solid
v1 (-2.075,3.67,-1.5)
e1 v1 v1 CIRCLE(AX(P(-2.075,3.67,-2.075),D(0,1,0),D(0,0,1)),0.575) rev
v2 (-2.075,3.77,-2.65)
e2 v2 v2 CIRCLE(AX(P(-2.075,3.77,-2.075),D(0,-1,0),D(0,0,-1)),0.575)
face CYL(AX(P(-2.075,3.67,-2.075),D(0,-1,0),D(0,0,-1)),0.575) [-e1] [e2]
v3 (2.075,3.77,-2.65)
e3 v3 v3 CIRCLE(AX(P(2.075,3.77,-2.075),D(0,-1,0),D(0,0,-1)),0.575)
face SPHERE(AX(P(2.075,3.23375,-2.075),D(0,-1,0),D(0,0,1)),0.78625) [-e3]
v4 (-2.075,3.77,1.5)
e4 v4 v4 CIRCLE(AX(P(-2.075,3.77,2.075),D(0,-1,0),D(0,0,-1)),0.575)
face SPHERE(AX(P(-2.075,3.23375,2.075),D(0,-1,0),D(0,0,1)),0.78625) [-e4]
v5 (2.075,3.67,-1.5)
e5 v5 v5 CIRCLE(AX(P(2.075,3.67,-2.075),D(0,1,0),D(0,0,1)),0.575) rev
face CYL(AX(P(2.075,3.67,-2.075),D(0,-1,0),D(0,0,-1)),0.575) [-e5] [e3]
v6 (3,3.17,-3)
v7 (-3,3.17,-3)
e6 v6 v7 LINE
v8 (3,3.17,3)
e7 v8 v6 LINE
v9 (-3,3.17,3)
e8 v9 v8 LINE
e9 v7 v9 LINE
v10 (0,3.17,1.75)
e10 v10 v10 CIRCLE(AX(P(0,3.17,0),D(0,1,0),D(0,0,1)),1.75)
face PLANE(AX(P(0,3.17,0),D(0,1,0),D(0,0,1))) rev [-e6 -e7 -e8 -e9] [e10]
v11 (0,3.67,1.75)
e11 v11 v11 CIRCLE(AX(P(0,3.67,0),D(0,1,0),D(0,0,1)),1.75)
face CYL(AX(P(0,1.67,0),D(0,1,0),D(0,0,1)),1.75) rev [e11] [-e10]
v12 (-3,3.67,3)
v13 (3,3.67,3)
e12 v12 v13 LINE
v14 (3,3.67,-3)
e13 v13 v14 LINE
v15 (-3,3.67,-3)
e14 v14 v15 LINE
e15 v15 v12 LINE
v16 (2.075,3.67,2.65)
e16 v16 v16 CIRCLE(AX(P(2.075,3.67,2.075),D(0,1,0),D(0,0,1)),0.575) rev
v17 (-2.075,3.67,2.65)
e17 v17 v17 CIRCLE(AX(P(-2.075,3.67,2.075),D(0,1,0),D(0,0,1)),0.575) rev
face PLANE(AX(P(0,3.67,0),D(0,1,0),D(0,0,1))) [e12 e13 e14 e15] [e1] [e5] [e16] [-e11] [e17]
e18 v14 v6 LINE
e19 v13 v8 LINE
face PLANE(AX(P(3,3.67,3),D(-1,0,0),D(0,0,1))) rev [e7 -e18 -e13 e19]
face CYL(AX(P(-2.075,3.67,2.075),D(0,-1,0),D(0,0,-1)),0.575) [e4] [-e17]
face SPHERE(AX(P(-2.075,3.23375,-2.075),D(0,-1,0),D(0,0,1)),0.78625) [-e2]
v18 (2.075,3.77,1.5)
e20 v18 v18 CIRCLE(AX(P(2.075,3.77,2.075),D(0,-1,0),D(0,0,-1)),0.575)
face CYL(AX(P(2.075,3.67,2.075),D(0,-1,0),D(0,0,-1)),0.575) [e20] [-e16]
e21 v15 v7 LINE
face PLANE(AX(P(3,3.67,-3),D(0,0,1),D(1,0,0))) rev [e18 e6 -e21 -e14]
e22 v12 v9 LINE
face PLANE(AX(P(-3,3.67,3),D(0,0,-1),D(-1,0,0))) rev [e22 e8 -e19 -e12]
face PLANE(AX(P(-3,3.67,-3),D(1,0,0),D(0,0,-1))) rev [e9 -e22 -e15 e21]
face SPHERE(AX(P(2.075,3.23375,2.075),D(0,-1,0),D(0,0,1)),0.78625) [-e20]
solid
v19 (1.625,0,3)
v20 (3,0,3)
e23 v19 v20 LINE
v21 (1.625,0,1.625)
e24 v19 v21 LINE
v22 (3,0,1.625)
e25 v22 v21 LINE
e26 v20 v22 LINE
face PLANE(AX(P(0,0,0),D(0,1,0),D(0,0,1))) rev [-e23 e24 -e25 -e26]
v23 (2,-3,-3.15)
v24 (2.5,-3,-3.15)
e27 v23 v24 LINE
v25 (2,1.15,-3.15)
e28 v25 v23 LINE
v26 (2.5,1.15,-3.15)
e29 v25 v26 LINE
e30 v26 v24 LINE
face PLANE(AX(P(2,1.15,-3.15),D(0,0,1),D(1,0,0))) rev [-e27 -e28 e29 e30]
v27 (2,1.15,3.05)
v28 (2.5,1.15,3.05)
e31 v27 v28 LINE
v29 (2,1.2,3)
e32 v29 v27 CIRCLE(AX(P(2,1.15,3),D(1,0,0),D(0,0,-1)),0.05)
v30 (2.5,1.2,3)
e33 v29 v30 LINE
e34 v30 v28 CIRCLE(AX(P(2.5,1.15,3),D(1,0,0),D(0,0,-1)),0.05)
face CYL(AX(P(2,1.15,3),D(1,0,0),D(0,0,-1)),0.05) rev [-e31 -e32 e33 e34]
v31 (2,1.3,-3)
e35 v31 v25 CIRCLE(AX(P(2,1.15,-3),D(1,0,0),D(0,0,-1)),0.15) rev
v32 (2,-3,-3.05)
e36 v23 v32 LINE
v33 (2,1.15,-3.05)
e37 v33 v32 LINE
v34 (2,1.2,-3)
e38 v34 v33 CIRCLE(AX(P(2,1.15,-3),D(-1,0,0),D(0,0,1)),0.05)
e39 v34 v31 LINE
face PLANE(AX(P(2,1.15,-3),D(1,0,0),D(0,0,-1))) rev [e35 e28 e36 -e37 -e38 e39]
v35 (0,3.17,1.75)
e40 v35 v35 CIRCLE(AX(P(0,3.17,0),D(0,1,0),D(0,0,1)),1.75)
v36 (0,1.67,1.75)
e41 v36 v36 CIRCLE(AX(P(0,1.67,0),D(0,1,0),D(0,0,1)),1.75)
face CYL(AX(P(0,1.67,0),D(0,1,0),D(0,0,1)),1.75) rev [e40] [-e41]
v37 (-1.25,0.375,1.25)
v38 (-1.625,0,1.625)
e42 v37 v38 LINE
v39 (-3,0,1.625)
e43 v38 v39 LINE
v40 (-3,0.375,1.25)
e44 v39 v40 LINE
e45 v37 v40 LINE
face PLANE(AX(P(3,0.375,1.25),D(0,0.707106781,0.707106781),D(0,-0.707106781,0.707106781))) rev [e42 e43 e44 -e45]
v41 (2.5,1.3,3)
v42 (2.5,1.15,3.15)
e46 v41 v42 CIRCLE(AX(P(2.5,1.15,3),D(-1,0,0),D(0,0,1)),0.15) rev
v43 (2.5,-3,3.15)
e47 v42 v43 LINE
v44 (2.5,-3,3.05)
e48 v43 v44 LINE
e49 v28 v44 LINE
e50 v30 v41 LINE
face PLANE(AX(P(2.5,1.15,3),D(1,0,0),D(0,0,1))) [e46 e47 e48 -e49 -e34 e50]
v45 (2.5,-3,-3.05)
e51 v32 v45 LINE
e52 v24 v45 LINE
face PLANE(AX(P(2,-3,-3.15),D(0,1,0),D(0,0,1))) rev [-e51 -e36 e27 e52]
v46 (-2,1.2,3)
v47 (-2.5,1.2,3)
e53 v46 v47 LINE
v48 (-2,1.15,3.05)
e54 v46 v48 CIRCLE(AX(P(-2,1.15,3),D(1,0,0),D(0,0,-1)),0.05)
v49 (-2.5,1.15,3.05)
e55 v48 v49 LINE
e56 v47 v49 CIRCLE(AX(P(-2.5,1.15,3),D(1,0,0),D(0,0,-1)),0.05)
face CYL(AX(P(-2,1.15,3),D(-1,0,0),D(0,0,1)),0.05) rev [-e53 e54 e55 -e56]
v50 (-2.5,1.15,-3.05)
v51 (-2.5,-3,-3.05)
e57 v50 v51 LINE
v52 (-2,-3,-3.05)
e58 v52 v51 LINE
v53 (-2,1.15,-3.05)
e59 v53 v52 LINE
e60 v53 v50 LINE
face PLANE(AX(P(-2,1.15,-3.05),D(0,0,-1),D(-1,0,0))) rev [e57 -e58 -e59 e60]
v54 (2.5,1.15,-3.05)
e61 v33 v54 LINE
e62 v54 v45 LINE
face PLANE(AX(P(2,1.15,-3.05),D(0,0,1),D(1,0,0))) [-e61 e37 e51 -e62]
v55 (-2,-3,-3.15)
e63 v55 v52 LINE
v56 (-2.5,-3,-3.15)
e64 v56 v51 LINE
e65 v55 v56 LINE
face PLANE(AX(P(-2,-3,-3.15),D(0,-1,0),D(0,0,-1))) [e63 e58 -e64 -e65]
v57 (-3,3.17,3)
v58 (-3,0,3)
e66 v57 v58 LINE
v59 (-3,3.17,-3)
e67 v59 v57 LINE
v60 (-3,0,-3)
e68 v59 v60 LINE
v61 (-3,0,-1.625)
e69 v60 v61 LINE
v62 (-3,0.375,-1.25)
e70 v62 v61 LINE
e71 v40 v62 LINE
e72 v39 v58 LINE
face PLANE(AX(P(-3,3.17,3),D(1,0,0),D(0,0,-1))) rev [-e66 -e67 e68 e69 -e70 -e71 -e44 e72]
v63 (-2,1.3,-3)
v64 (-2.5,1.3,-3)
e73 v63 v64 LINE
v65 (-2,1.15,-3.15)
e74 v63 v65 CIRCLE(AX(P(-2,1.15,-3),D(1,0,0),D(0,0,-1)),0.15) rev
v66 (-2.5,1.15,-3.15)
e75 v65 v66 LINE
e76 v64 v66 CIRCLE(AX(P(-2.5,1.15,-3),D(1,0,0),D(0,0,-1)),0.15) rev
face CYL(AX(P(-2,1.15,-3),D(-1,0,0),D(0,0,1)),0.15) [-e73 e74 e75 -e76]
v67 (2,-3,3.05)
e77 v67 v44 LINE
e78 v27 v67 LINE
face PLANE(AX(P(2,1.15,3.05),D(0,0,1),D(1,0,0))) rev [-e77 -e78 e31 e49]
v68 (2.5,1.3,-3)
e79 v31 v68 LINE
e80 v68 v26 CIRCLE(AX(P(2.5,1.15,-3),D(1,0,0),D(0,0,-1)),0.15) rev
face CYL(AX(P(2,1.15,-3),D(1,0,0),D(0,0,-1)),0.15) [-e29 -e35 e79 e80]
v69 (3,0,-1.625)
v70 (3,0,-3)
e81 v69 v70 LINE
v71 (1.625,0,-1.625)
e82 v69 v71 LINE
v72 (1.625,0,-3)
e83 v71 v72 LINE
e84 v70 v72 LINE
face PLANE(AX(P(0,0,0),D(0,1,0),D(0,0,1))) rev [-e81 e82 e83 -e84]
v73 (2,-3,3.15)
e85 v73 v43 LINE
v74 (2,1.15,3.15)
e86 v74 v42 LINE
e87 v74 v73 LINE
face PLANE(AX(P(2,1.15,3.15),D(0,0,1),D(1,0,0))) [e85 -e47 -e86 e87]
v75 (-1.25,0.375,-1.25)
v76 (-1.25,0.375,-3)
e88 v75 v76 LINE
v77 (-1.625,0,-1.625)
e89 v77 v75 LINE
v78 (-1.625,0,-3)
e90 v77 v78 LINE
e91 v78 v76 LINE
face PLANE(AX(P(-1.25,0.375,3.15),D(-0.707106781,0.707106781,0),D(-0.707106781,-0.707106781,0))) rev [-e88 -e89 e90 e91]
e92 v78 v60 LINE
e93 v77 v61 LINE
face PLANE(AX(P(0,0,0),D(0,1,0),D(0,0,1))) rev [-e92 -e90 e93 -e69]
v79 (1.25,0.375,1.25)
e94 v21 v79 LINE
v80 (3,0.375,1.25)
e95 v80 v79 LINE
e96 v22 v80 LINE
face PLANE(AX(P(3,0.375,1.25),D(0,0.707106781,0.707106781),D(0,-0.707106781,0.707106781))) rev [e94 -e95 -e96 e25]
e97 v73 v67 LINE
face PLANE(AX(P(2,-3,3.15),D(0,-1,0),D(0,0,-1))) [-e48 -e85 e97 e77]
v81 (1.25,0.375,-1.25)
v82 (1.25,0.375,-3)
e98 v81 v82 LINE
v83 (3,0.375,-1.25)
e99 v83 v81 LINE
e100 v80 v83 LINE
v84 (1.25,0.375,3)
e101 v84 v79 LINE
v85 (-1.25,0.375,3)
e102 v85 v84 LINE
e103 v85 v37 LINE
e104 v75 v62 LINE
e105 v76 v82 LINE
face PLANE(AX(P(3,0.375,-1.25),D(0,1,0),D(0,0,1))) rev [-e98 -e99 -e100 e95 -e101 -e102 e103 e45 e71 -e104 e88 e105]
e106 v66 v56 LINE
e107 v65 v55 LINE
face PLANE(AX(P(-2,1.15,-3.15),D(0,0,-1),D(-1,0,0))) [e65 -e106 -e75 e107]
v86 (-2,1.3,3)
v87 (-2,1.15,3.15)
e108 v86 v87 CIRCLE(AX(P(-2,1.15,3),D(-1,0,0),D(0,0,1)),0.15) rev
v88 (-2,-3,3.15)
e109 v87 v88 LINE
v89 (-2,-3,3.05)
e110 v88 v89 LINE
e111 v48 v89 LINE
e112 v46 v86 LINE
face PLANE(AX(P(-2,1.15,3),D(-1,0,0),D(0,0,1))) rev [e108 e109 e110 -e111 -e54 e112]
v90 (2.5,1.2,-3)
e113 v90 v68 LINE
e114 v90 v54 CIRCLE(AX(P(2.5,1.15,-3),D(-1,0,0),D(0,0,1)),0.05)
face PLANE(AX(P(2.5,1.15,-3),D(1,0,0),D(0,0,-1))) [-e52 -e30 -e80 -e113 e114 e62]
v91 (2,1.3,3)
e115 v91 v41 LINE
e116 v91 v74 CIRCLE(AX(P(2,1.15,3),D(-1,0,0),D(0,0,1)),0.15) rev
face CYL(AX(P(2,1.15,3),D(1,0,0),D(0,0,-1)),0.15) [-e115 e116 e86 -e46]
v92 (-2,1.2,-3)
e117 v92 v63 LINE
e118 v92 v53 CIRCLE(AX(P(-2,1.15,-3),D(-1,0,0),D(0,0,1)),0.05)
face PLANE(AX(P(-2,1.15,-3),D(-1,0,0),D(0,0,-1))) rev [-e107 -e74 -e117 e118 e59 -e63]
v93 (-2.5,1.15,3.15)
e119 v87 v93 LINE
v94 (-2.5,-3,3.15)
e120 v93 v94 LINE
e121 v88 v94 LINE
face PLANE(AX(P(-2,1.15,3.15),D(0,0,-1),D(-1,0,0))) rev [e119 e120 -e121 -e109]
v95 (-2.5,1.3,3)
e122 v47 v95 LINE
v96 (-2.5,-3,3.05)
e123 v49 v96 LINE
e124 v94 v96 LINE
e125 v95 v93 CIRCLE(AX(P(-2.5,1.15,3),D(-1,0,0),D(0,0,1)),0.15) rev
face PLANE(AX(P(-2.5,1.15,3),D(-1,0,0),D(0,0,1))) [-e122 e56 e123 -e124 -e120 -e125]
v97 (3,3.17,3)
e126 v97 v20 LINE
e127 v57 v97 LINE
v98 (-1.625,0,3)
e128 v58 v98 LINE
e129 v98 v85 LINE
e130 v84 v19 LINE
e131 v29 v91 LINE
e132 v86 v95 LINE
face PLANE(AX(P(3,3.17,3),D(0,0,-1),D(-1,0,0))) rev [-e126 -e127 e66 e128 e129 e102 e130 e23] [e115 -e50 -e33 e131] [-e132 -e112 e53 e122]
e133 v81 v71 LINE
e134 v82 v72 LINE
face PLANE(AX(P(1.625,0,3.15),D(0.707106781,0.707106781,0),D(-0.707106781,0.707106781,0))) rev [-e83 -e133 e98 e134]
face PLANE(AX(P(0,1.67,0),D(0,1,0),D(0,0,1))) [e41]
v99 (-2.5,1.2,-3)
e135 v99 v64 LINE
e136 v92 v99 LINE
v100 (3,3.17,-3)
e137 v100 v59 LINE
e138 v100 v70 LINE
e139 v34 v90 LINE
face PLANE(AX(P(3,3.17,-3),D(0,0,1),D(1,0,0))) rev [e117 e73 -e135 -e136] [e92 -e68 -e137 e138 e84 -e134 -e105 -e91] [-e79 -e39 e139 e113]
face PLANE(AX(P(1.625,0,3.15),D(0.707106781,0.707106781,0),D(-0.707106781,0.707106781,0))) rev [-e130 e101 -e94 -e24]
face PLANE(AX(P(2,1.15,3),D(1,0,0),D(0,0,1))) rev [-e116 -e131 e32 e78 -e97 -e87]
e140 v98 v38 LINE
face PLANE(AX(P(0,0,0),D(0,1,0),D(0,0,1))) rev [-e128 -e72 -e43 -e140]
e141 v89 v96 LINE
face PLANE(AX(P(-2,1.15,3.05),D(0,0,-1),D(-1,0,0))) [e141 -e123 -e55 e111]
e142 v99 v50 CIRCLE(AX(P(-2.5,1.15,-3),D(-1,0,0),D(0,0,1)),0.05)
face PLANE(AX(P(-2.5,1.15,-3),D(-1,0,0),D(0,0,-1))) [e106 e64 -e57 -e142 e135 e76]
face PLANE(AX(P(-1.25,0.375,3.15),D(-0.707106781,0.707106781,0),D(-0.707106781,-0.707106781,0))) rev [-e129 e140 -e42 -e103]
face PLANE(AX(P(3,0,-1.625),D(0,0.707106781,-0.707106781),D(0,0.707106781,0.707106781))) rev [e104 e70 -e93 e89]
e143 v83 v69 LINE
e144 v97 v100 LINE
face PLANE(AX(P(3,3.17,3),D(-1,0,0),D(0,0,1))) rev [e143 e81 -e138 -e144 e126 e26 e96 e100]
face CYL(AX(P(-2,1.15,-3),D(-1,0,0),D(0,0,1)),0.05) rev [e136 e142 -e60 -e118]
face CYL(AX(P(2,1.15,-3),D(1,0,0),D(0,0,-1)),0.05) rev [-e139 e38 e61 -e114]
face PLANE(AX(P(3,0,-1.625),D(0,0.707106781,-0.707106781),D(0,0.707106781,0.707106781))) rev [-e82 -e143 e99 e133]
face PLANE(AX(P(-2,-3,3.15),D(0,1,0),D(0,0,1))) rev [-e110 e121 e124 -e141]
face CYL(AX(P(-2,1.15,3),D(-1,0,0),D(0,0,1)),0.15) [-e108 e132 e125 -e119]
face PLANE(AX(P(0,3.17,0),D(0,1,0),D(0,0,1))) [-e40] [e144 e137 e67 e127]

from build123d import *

# Parameters (mm, degrees)
SKETCH1_W                                = 6
SKETCH1_H                                = 6
BOSS_EXTRUDE1_DEPTH                      = 3.17
SKETCH2_W                                = 6
SKETCH2_H                                = 6
BOSS_EXTRUDE2_DEPTH                      = 0.5
SKETCH5_R                                = 1.75
CUT_EXTRUDE1_DEPTH                       = 2
EXTRUDE_THIN1_DEPTH                      = 0.5
MIRROR1_AT_THE_SECOND_PLANE_COPY_1_DEPTH = 0.5
CUT_EXTRUDE4_DEPTH                       = 8.879270271
CIRPATTERN1_COUNT                        = 2
CIRPATTERN1_ANGLE                        = 90


# Read off the part's stored shape, not the designer's step: Sketch-Pattern1
with BuildPart() as part:
    # Sketch1 → Boss-Extrude1 (new body)
    with BuildSketch(Plane(origin=(0, 0, 0), x_dir=(1, 0, 0), z_dir=(0, 1, 0))):
        Rectangle(SKETCH1_W, SKETCH1_H)
    extrude(amount=BOSS_EXTRUDE1_DEPTH)


with BuildPart() as body_2:
    # Sketch2 → Boss-Extrude2 (new body)
    with BuildSketch(Plane(origin=(0, 3.17, 0), x_dir=(1, 0, 0), z_dir=(0, 1, 0))):
        Rectangle(SKETCH2_W, SKETCH2_H)
    extrude(amount=BOSS_EXTRUDE2_DEPTH)

    # Sketch4 → Revolve1 (revolve)
    with BuildSketch(Plane.YZ.offset(2.075), mode=Mode.PRIVATE) as revolve1_sk:
        with BuildLine():
            Line((3.67, 2.65), (3.77, 2.65))
            ThreePointArc((3.77, 2.65), (3.954796332, 2.388498405), (4.02, 2.075))
            Line((4.02, 2.075), (3.67, 2.075))
            Line((3.67, 2.075), (3.17, 2.075))
            Line((3.17, 2.075), (3.17, 2.65))
            Line((3.17, 2.65), (3.67, 2.65))
        make_face()
    revolve(revolve1_sk.sketch.rotate(Axis((2.075, 3.67, 2.075), (0, 1, 0)), 180), axis=Axis((2.075, 3.67, 2.075), (0, 1, 0)))

    # Sketch-Pattern1 outline → Sketch-Pattern1 (revolve)
    with BuildSketch(Plane(origin=(-2.075, 0, 2.075), x_dir=(1, 0, 0), z_dir=(0, 0, 1))):
        with BuildLine():
            Line((0.575, 3.67), (0.575000001, 3.769999999))
            ThreePointArc((0.575000001, 3.769999999), (0.313498406, 3.954796332), (0, 4.02))
            Line((0, 4.02), (0, 3.67))
            Line((0, 3.67), (0.575, 3.67))
        make_face()
    revolve(axis=Axis((-2.075, 0, 2.075), (0, 1, 0)))

    # Sketch-Pattern1 2 outline → Sketch-Pattern1 2 (revolve)
    with BuildSketch(Plane(origin=(-2.075, 0, -2.075), x_dir=(1, 0, 0), z_dir=(0, 0, 1))):
        with BuildLine():
            Line((0.575, 3.67), (0.575000001, 3.769999999))
            ThreePointArc((0.575000001, 3.769999999), (0.313498406, 3.954796332), (0, 4.02))
            Line((0, 4.02), (0, 3.67))
            Line((0, 3.67), (0.575, 3.67))
        make_face()
    revolve(axis=Axis((-2.075, 0, -2.075), (0, 1, 0)))

    # Sketch-Pattern1 3 outline → Sketch-Pattern1 3 (revolve)
    with BuildSketch(Plane(origin=(2.075, 0, -2.075), x_dir=(1, 0, 0), z_dir=(0, 0, 1))):
        with BuildLine():
            Line((0.575, 3.67), (0.575000001, 3.769999999))
            ThreePointArc((0.575000001, 3.769999999), (0.313498406, 3.954796332), (0, 4.02))
            Line((0, 4.02), (0, 3.67))
            Line((0, 3.67), (0.575, 3.67))
        make_face()
    revolve(axis=Axis((2.075, 0, -2.075), (0, 1, 0)))


with BuildPart() as cut_extrude1_tool:
    # Sketch5 → Cut-Extrude1 (new body)
    with BuildSketch(Plane(origin=(0, 3.67, 0), x_dir=(1, 0, 0), z_dir=(0, 1, 0))):
        with Locations(Location((0, 0, 0), (0, 0, 270))):
            Circle(SKETCH5_R)
    extrude(amount=-CUT_EXTRUDE1_DEPTH)


with BuildPart() as part_1:
    add(part.part)

    # Cut-Extrude1: cut by cut_extrude1_tool
    add(cut_extrude1_tool.part, mode=Mode.SUBTRACT)

    # Sketch6 → Extrude-Thin1 (add)
    with BuildSketch(Plane.ZY.offset(2.5)):
        with BuildLine():
            ThreePointArc((3, 1.2), (3.035355348, 1.185355337), (3.05, 1.149999984))
            Line((3.05, 1.149999984), (3.05, -3))
            Line((3.05, -3), (3.15, -3))
            Line((3.15, -3), (3.15, 1.150000012))
            ThreePointArc((3.15, 1.150000012), (3.106066008, 1.256066033), (2.999999977, 1.3))
            Line((2.999999977, 1.3), (3, 1.2))
        make_face()
    extrude_thin1 = extrude(amount=-EXTRUDE_THIN1_DEPTH)

    # Mirror1: Extrude-Thin1 across plane
    add(extrude_thin1.mirror(Plane.XY))

    # Mirror1 at the second plane: Extrude-Thin1 across plane
    add(extrude_thin1.mirror(Plane(origin=(0, 0, 0), x_dir=(0, 0, 1), z_dir=(1, 0, 0))))

    # Mirror1 at the second plane copy 1 sketc → Mirror1 at the second plane copy 1 (add)
    with BuildSketch(Plane(origin=(2.5, 0, 0), x_dir=(0, 0, -1), z_dir=(1, 0, 0))):
        with BuildLine():
            ThreePointArc((3, 1.2), (3.035355348, 1.185355337), (3.05, 1.149999984))
            Line((3.05, 1.149999984), (3.05, -3))
            Line((3.05, -3), (3.15, -3))
            Line((3.15, -3), (3.15, 1.150000012))
            ThreePointArc((3.15, 1.150000012), (3.106066008, 1.256066033), (2.999999977, 1.3))
            Line((2.999999977, 1.3), (3, 1.2))
        make_face()
    extrude(amount=-MIRROR1_AT_THE_SECOND_PLANE_COPY_1_DEPTH)

    # Sketch7 → Cut-Extrude4 (cut, through all)
    with BuildSketch(Plane.ZY.offset(3)):
        Polygon((-1.625, 0), (-1.25, 0.375), (1.25, 0.375), (1.625, 0), align=None)
    cut_extrude4 = extrude(amount=-CUT_EXTRUDE4_DEPTH, mode=Mode.SUBTRACT)

    # CirPattern1: Cut-Extrude4 ×2 about axis
    cirpattern1_axis = Axis((0, 4.371, 0), (0, -1, 0))
    for i in range(1, CIRPATTERN1_COUNT):
        add(cut_extrude4.rotate(cirpattern1_axis, i * CIRPATTERN1_ANGLE / (CIRPATTERN1_COUNT - 1)), mode=Mode.SUBTRACT)


with BuildPart() as body_2_1:
    add(body_2.part)

    # Cut-Extrude1: cut by cut_extrude1_tool
    add(cut_extrude1_tool.part, mode=Mode.SUBTRACT)


solid = Compound([part_1.part, body_2_1.part])
